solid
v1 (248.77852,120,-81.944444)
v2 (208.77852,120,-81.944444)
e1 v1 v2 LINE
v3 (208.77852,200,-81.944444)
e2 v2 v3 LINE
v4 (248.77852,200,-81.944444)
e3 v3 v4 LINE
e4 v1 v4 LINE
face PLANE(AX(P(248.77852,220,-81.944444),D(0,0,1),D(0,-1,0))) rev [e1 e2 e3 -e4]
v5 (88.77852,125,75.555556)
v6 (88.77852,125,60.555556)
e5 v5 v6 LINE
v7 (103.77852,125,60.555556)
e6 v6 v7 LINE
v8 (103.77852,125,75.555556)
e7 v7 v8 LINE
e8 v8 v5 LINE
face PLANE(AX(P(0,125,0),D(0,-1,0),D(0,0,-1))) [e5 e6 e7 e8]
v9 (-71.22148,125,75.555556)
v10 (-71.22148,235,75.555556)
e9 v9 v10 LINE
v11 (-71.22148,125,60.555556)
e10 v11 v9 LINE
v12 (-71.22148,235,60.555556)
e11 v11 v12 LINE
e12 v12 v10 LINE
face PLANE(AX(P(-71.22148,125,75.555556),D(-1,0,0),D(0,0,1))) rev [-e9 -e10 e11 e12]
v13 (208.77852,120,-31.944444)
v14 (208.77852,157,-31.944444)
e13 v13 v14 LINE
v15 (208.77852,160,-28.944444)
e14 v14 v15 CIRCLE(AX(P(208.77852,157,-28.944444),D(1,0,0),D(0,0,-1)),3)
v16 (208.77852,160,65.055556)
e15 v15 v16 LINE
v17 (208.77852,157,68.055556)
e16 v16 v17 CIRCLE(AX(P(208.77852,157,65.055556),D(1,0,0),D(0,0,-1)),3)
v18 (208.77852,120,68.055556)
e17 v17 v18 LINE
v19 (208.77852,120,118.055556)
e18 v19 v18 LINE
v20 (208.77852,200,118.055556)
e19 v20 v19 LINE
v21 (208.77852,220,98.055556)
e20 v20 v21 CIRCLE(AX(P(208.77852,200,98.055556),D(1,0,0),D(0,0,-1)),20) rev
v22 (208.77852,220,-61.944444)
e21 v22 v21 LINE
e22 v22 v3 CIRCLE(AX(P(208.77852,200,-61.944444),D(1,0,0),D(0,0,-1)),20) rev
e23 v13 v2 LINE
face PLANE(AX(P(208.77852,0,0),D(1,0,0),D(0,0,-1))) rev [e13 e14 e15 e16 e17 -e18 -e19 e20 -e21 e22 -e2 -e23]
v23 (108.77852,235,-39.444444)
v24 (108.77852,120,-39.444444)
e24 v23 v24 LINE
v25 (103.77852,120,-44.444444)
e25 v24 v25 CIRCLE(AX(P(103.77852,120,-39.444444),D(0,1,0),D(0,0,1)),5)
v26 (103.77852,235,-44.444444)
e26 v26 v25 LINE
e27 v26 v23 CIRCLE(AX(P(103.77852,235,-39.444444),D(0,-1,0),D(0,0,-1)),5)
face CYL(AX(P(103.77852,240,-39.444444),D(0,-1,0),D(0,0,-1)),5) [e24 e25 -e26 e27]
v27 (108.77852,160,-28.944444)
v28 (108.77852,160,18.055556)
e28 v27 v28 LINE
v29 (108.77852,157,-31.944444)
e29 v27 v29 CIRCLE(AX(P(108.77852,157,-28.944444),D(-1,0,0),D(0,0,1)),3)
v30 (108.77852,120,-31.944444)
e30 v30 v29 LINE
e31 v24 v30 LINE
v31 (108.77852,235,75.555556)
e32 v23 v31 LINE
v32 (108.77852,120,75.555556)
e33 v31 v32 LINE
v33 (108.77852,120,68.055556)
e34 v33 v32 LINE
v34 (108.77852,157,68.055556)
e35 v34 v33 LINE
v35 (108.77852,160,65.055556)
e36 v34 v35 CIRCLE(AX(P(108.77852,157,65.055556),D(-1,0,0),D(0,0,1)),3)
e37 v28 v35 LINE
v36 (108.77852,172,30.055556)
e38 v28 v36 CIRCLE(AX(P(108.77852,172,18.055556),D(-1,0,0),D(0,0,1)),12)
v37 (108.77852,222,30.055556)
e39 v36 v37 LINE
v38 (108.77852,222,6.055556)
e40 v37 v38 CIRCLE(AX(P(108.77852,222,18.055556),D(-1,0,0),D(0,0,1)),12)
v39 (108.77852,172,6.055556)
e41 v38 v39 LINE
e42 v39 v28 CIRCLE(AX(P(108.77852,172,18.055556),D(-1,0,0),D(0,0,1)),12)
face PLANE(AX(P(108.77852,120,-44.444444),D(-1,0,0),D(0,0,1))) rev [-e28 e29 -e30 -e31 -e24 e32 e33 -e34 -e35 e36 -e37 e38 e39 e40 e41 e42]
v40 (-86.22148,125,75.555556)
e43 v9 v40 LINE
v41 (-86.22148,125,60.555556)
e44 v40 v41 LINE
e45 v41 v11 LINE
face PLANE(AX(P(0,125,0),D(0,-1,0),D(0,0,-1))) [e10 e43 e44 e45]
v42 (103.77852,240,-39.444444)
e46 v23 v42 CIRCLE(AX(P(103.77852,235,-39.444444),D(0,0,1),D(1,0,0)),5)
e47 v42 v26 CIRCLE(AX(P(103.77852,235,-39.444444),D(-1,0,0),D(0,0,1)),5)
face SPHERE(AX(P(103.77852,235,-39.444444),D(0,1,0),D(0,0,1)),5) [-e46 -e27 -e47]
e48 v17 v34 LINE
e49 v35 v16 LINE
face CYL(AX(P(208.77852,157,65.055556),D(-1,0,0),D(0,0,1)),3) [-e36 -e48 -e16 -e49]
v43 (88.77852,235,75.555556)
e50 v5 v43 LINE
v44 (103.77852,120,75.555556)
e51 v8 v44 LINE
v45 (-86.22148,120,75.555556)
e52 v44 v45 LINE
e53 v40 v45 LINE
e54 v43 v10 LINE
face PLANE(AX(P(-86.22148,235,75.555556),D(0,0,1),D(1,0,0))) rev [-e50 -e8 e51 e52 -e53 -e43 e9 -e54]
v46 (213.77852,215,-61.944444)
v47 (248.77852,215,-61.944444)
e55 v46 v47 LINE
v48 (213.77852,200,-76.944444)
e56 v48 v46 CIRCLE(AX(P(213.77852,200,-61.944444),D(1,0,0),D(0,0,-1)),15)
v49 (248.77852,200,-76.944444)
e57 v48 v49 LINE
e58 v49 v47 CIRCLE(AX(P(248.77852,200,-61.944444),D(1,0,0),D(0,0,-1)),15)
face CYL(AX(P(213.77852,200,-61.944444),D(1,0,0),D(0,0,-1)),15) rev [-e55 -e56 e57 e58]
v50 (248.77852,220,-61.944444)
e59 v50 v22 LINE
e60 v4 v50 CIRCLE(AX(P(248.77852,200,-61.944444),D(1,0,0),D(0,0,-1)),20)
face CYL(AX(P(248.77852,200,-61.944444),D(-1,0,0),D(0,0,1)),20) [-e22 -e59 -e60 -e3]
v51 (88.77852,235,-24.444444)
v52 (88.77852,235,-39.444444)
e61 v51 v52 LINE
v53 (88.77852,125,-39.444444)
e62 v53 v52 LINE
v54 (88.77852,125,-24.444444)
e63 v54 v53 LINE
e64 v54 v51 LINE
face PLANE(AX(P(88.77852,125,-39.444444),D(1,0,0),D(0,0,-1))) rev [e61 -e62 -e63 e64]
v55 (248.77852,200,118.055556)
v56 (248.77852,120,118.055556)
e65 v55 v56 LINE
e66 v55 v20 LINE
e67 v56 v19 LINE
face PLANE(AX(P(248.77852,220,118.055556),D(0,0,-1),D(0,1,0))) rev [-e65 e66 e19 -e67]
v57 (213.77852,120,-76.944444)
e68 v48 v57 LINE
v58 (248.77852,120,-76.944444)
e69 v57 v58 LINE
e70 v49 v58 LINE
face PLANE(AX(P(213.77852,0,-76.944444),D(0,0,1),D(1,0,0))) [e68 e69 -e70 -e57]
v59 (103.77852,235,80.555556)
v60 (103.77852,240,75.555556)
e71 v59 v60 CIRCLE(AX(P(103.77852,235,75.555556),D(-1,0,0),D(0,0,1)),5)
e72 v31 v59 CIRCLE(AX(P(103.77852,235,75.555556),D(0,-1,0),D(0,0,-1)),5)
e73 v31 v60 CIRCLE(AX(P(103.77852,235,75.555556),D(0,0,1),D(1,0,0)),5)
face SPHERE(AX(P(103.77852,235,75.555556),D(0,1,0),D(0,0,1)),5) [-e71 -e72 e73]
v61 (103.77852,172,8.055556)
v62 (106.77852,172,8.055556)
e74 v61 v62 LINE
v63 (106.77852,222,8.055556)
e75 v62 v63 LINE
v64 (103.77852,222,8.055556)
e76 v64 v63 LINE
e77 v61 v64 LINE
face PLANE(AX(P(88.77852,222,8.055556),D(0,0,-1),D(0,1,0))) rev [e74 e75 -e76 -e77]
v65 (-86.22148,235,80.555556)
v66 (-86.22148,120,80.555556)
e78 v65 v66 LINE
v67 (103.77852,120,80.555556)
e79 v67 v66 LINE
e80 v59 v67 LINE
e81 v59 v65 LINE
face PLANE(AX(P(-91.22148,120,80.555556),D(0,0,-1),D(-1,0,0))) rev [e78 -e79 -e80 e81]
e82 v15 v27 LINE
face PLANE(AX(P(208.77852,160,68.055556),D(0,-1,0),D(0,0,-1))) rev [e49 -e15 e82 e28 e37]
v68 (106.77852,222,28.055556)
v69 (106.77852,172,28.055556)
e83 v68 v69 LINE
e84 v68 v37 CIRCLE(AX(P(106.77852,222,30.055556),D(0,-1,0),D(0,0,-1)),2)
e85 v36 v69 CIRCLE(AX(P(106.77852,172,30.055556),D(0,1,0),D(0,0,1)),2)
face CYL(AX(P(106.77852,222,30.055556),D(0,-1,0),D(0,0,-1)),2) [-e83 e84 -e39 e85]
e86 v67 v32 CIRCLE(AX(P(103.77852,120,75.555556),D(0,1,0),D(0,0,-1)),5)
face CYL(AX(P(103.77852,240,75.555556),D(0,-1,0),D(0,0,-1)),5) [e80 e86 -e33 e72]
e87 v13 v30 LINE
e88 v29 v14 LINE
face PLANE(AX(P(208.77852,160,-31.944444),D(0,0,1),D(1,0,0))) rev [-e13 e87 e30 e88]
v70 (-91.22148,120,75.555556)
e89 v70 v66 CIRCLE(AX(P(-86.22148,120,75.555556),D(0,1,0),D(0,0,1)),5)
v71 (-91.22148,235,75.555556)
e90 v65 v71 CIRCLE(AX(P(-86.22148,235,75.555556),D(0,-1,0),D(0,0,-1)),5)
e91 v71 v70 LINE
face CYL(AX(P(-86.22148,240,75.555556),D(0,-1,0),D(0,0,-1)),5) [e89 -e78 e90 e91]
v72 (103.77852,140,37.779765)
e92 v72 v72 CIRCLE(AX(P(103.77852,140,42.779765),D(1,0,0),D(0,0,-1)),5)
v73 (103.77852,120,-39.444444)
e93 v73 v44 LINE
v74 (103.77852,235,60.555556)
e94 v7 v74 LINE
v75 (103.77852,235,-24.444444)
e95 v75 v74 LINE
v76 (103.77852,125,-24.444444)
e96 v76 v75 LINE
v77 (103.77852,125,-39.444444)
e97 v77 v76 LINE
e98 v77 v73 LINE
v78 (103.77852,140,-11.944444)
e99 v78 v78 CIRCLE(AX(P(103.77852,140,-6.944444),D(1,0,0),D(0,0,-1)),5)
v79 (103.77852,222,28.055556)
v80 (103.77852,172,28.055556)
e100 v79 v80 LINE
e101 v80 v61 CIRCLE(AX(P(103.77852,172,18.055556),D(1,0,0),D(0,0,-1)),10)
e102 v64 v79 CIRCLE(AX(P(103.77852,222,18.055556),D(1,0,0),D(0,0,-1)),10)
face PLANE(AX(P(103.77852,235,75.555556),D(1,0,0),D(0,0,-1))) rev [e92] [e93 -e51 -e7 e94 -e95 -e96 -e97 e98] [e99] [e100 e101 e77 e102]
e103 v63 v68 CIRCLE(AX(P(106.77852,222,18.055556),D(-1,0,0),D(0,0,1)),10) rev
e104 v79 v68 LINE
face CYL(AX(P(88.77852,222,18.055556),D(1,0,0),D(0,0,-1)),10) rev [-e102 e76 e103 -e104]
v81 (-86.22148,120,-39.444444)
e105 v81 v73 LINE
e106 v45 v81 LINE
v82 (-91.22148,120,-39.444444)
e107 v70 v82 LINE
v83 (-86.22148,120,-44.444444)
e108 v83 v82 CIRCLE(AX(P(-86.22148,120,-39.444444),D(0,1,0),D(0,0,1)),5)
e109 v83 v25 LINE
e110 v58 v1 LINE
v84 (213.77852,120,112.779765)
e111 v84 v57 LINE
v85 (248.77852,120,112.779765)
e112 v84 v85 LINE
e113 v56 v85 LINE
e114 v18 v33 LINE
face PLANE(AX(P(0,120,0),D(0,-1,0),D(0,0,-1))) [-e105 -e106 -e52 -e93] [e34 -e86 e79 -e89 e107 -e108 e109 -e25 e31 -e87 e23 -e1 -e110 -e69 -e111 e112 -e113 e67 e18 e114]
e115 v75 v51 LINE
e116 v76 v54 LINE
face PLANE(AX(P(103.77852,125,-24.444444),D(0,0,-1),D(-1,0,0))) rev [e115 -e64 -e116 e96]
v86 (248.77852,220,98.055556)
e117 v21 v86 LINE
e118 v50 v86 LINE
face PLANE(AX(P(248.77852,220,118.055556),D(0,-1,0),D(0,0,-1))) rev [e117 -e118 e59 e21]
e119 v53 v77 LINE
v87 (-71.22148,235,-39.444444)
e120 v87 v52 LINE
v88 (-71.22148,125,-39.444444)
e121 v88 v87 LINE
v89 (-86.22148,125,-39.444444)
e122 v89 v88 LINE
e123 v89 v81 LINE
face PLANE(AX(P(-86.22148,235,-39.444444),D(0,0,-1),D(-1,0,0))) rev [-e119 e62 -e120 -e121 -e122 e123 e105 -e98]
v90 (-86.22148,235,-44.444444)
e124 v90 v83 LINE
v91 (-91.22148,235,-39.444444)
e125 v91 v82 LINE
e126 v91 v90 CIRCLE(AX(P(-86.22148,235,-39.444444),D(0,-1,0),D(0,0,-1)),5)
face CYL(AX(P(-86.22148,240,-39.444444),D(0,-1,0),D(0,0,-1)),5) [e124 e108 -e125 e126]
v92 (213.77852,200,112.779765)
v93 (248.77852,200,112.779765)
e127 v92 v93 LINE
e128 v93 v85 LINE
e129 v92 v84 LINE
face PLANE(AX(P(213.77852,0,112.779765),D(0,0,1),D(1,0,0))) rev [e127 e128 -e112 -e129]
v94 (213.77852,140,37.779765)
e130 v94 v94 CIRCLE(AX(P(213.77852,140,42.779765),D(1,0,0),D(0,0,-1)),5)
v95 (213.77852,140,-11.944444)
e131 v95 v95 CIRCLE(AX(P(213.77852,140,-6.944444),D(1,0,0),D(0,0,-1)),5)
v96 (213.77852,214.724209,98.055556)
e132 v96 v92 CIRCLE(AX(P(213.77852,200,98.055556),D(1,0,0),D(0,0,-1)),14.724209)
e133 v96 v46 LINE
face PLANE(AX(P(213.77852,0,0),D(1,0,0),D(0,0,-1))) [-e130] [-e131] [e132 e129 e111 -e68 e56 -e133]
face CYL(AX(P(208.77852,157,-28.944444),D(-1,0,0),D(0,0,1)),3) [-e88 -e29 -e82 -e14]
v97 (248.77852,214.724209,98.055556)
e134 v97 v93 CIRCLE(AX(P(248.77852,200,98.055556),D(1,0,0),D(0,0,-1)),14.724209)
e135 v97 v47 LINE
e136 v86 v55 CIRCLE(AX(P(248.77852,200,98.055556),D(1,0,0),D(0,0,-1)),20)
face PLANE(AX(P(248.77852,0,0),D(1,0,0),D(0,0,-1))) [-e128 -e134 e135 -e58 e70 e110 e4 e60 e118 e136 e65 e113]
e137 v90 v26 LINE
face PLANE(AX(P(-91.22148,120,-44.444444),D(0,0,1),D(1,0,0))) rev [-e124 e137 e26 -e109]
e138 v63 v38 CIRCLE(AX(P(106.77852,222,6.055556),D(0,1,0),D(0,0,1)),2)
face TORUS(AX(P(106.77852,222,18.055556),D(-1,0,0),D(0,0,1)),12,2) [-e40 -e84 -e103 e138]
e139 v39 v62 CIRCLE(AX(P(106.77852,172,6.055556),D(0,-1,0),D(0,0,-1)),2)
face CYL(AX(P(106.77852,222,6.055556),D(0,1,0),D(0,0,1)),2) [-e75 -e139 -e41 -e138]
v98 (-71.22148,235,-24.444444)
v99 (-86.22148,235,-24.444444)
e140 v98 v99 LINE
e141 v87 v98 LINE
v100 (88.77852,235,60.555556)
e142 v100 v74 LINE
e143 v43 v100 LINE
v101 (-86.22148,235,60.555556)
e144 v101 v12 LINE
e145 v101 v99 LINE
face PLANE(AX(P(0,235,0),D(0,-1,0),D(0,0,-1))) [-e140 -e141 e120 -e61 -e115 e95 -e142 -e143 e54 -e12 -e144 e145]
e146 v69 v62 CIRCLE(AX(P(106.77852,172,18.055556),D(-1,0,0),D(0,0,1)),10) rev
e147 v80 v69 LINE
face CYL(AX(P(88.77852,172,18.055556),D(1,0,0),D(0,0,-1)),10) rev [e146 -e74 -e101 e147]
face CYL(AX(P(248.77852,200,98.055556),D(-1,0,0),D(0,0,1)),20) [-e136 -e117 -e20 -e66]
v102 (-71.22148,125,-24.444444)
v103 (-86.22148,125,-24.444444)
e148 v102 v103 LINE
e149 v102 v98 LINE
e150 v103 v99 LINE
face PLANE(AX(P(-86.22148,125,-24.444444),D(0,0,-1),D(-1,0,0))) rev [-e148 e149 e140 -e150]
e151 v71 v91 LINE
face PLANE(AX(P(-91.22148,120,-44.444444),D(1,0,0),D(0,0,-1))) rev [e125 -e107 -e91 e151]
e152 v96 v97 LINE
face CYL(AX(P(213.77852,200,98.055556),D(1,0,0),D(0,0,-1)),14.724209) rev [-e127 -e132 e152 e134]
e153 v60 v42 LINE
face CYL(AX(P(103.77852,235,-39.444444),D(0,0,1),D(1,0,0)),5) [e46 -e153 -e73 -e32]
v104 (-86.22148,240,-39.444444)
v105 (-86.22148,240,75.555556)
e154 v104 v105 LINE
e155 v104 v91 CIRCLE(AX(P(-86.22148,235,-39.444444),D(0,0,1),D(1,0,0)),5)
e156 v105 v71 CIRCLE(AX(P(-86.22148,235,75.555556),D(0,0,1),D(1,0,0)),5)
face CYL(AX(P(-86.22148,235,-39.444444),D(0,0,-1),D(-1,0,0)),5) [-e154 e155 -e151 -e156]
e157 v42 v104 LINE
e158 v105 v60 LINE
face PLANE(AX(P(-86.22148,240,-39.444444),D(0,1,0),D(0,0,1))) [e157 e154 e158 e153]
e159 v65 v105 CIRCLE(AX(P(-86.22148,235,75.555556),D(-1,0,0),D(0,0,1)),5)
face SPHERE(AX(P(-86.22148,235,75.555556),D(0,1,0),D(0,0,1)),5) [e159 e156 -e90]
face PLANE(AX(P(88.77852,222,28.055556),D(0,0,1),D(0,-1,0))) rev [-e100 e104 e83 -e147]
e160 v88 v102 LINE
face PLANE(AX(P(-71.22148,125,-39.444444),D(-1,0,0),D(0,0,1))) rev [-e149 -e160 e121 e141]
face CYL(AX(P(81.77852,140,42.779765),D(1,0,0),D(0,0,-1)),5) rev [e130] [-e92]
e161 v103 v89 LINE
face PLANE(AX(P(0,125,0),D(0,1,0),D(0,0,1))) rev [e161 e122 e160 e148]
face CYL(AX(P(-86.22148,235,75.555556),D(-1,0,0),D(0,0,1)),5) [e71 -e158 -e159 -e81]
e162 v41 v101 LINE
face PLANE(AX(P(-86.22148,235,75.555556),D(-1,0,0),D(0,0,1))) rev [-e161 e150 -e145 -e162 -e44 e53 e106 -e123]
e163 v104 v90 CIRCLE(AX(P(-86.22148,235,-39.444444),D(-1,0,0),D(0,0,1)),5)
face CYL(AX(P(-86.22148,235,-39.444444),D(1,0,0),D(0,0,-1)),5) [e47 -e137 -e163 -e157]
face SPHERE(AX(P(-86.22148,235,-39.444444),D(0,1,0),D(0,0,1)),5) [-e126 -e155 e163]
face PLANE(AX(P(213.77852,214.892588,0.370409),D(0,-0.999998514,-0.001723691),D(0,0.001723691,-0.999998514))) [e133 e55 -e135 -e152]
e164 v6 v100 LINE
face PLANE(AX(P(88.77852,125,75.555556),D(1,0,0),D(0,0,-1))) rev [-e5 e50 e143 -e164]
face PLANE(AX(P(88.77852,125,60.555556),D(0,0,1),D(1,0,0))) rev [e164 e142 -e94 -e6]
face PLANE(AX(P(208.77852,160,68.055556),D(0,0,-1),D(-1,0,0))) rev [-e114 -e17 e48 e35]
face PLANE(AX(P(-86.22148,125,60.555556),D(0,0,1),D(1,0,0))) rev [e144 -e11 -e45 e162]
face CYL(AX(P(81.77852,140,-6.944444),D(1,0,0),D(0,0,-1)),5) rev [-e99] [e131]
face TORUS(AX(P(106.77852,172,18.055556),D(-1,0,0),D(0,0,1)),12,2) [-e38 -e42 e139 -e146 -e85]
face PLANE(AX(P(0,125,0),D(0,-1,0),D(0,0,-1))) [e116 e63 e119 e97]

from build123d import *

# Parameters (mm, degrees)
SKETCH1_W           = 200
SKETCH1_H           = 125
BOSS_EXTRUDE1_DEPTH = 120
BOSS_EXTRUDE2_DEPTH = 120
SKETCH3_W           = 200
SKETCH3_H           = 125
CUT_EXTRUDE1_DEPTH  = 120
FILLET1_R           = 5
SKETCH4_W           = 100
SKETCH4_H           = 40
BOSS_EXTRUDE3_DEPTH = 100
FILLET3_R           = 3
SKETCH5_W           = 190
SKETCH5_H           = 115
CUT_EXTRUDE2_DEPTH  = 115
SKETCH6_W           = 15
SKETCH6_H           = 15
BOSS_EXTRUDE4_DEPTH = 110
SKETCH7_W           = 200
SKETCH7_H           = 100
BOSS_EXTRUDE5_DEPTH = 40
FILLET4_R           = 20
SKETCH9_W           = 189.724209099
SKETCH9_H           = 80
CUT_EXTRUDE9_DEPTH  = 35
CUT_EXTRUDE10_DEPTH = 35
CUT_EXTRUDE11_DEPTH = 20
FILLET5_R           = 2
SKETCH11_R          = 5
CUT_EXTRUDE12_DEPTH = 132


with BuildPart() as part:
    # Sketch1 → Boss-Extrude1 (new body)
    with BuildSketch(Plane(origin=(0, 0, 0), x_dir=(1, 0, 0), z_dir=(0, 1, 0))):
        with Locations((8.778519755, -18.055555556)):
            Rectangle(SKETCH1_W, SKETCH1_H)
    extrude(amount=BOSS_EXTRUDE1_DEPTH)

    # Sketch2 → Boss-Extrude2 (add)
    with BuildSketch(Plane(origin=(0, 120, 0), x_dir=(1, 0, 0), z_dir=(0, 1, 0))):
        with BuildLine():
            Line((-86.221480245, 44.444444444), (103.778519755, 44.444444444))
            ThreePointArc((103.778519755, 44.444444444), (107.314053661, 42.97997835), (108.778519755, 39.444444444))
            Line((108.778519755, 39.444444444), (108.778519755, -75.555555556))
            ThreePointArc((108.778519755, -75.555555556), (107.314053661, -79.091089461), (103.778519755, -80.555555556))
            Line((103.778519755, -80.555555556), (-86.221480245, -80.555555556))
            ThreePointArc((-86.221480245, -80.555555556), (-89.757014151, -79.091089461), (-91.221480245, -75.555555556))
            Line((-91.221480245, -75.555555556), (-91.221480245, 39.444444444))
            ThreePointArc((-91.221480245, 39.444444444), (-89.757014151, 42.97997835), (-86.221480245, 44.444444444))
        make_face()
    extrude(amount=BOSS_EXTRUDE2_DEPTH)

    # Sketch3 → Cut-Extrude1 (cut)
    with BuildSketch(Plane(origin=(0, 0, 0), x_dir=(-1, 0, 0), z_dir=(0, -1, 0))):
        with Locations((-8.778519755, -18.055555556)):
            Rectangle(SKETCH3_W, SKETCH3_H)
    extrude(amount=-CUT_EXTRUDE1_DEPTH, mode=Mode.SUBTRACT)

    # Fillet1
    fillet1_edges = [part.edges().sort_by_distance(p)[0] for p in [
        (-89.757014151, 240, -42.97997835),
        (-91.221480245, 240, 18.055555556),
        (-89.757014151, 240, 79.091089461),
        (8.778519755, 240, 80.555555556),
        (107.314053661, 240, 79.091089461),
        (108.778519755, 240, 18.055555556),
        (107.314053661, 240, -42.97997835),
        (8.778519755, 240, -44.444444444),
    ]]
    fillet(fillet1_edges, radius=FILLET1_R)

    # Sketch4 → Boss-Extrude3 (add)
    with BuildSketch(Plane(origin=(108.778519755, 0, 0), x_dir=(0, 0, -1), z_dir=(1, 0, 0))):
        with Locations((-18.055555556, 140)):
            Rectangle(SKETCH4_W, SKETCH4_H)
    extrude(amount=BOSS_EXTRUDE3_DEPTH)

    # Fillet3
    fillet3_edges = [part.edges().sort_by_distance(p)[0] for p in [
        (158.778519755, 160, 68.055555556),
        (158.778519755, 160, -31.944444444),
    ]]
    fillet(fillet3_edges, radius=FILLET3_R)

    # Sketch5 → Cut-Extrude2 (cut)
    with BuildSketch(Plane(origin=(0, 120, 0), x_dir=(-1, 0, 0), z_dir=(0, -1, 0))):
        with Locations((-8.778519755, -18.055555556)):
            Rectangle(SKETCH5_W, SKETCH5_H)
    extrude(amount=-CUT_EXTRUDE2_DEPTH, mode=Mode.SUBTRACT)

    # Sketch6 → Boss-Extrude4 (add)
    with BuildSketch(Plane(origin=(0, 235, 0), x_dir=(-1, 0, 0), z_dir=(0, -1, 0))):
        with Locations((78.721480245, -68.055555556)):
            Rectangle(SKETCH6_W, SKETCH6_H)
        with Locations((-96.278519755, -68.055555556)):
            Rectangle(SKETCH6_W, SKETCH6_H)
        with Locations((-96.278519755, 31.944444444)):
            Rectangle(SKETCH6_W, SKETCH6_H)
        with Locations((78.721480245, 31.944444444)):
            Rectangle(SKETCH6_W, SKETCH6_H)
    extrude(amount=BOSS_EXTRUDE4_DEPTH)

    # Sketch7 → Boss-Extrude5 (add)
    with BuildSketch(Plane(origin=(208.778519755, 0, 0), x_dir=(0, 0, -1), z_dir=(1, 0, 0))):
        with Locations((-18.055555556, 170)):
            Rectangle(SKETCH7_W, SKETCH7_H)
    extrude(amount=BOSS_EXTRUDE5_DEPTH)

    # Fillet4
    fillet4_edges = [part.edges().sort_by_distance(p)[0] for p in [
        (228.778519755, 220, 118.055555556),
        (228.778519755, 220, -81.944444444),
    ]]
    fillet(fillet4_edges, radius=FILLET4_R)

    # Sketch9 → Cut-Extrude9 (cut)
    with BuildSketch(Plane(origin=(248.778519755, 0, 0), x_dir=(0, 0, -1), z_dir=(1, 0, 0))):
        with Locations((-17.917660106, 160)):
            Rectangle(SKETCH9_W, SKETCH9_H)
    extrude(amount=-CUT_EXTRUDE9_DEPTH, mode=Mode.SUBTRACT)

    # Sketch9<3> → Cut-Extrude10 (cut)
    with BuildSketch(Plane(origin=(248.778519755, 0, 0), x_dir=(0, 0, -1), z_dir=(1, 0, 0))):
        with BuildLine():
            Line((-112.779764655, 200), (76.944444444, 200))
            ThreePointArc((76.944444444, 200), (72.551046162, 210.606601718), (61.944444444, 215))
            Line((61.944444444, 215), (-98.055555556, 214.7242091))
            ThreePointArc((-98.055555556, 214.7242091), (-108.467143658, 210.411588102), (-112.779764655, 200))
        make_face()
    extrude(amount=-CUT_EXTRUDE10_DEPTH, mode=Mode.SUBTRACT)

    # Sketch10 → Cut-Extrude11 (cut)
    with BuildSketch(Plane(origin=(108.778519755, 0, 0), x_dir=(0, 0, -1), z_dir=(1, 0, 0))):
        with BuildLine():
            Line((-28.055555556, 222), (-28.055555556, 172))
            ThreePointArc((-28.055555556, 172), (-18.055555556, 162), (-8.055555556, 172))
            Line((-8.055555556, 172), (-8.055555556, 222))
            ThreePointArc((-8.055555556, 222), (-18.055555556, 232), (-28.055555556, 222))
        make_face()
    extrude(amount=-CUT_EXTRUDE11_DEPTH, mode=Mode.SUBTRACT)

    # Fillet5
    fillet5_edges = [part.edges().sort_by_distance(p)[0] for p in [
        (108.778519755, 232, 18.055555556),
        (108.778519755, 197, 28.055555556),
        (108.778519755, 162, 18.055555556),
        (108.778519755, 197, 8.055555556),
    ]]
    fillet(fillet5_edges, radius=FILLET5_R - 0.0001)  # a hair under: the kernel refuses the full size

    # Sketch11 → Cut-Extrude12 (cut)
    with BuildSketch(Plane(origin=(213.778519755, 0, 0), x_dir=(0, 0, -1), z_dir=(1, 0, 0))):
        with Locations((-42.779764655, 140)):
            Circle(SKETCH11_R)
        with Locations((6.944444444, 140)):
            Circle(SKETCH11_R)
    extrude(amount=-CUT_EXTRUDE12_DEPTH, mode=Mode.SUBTRACT)


solid = part.part
